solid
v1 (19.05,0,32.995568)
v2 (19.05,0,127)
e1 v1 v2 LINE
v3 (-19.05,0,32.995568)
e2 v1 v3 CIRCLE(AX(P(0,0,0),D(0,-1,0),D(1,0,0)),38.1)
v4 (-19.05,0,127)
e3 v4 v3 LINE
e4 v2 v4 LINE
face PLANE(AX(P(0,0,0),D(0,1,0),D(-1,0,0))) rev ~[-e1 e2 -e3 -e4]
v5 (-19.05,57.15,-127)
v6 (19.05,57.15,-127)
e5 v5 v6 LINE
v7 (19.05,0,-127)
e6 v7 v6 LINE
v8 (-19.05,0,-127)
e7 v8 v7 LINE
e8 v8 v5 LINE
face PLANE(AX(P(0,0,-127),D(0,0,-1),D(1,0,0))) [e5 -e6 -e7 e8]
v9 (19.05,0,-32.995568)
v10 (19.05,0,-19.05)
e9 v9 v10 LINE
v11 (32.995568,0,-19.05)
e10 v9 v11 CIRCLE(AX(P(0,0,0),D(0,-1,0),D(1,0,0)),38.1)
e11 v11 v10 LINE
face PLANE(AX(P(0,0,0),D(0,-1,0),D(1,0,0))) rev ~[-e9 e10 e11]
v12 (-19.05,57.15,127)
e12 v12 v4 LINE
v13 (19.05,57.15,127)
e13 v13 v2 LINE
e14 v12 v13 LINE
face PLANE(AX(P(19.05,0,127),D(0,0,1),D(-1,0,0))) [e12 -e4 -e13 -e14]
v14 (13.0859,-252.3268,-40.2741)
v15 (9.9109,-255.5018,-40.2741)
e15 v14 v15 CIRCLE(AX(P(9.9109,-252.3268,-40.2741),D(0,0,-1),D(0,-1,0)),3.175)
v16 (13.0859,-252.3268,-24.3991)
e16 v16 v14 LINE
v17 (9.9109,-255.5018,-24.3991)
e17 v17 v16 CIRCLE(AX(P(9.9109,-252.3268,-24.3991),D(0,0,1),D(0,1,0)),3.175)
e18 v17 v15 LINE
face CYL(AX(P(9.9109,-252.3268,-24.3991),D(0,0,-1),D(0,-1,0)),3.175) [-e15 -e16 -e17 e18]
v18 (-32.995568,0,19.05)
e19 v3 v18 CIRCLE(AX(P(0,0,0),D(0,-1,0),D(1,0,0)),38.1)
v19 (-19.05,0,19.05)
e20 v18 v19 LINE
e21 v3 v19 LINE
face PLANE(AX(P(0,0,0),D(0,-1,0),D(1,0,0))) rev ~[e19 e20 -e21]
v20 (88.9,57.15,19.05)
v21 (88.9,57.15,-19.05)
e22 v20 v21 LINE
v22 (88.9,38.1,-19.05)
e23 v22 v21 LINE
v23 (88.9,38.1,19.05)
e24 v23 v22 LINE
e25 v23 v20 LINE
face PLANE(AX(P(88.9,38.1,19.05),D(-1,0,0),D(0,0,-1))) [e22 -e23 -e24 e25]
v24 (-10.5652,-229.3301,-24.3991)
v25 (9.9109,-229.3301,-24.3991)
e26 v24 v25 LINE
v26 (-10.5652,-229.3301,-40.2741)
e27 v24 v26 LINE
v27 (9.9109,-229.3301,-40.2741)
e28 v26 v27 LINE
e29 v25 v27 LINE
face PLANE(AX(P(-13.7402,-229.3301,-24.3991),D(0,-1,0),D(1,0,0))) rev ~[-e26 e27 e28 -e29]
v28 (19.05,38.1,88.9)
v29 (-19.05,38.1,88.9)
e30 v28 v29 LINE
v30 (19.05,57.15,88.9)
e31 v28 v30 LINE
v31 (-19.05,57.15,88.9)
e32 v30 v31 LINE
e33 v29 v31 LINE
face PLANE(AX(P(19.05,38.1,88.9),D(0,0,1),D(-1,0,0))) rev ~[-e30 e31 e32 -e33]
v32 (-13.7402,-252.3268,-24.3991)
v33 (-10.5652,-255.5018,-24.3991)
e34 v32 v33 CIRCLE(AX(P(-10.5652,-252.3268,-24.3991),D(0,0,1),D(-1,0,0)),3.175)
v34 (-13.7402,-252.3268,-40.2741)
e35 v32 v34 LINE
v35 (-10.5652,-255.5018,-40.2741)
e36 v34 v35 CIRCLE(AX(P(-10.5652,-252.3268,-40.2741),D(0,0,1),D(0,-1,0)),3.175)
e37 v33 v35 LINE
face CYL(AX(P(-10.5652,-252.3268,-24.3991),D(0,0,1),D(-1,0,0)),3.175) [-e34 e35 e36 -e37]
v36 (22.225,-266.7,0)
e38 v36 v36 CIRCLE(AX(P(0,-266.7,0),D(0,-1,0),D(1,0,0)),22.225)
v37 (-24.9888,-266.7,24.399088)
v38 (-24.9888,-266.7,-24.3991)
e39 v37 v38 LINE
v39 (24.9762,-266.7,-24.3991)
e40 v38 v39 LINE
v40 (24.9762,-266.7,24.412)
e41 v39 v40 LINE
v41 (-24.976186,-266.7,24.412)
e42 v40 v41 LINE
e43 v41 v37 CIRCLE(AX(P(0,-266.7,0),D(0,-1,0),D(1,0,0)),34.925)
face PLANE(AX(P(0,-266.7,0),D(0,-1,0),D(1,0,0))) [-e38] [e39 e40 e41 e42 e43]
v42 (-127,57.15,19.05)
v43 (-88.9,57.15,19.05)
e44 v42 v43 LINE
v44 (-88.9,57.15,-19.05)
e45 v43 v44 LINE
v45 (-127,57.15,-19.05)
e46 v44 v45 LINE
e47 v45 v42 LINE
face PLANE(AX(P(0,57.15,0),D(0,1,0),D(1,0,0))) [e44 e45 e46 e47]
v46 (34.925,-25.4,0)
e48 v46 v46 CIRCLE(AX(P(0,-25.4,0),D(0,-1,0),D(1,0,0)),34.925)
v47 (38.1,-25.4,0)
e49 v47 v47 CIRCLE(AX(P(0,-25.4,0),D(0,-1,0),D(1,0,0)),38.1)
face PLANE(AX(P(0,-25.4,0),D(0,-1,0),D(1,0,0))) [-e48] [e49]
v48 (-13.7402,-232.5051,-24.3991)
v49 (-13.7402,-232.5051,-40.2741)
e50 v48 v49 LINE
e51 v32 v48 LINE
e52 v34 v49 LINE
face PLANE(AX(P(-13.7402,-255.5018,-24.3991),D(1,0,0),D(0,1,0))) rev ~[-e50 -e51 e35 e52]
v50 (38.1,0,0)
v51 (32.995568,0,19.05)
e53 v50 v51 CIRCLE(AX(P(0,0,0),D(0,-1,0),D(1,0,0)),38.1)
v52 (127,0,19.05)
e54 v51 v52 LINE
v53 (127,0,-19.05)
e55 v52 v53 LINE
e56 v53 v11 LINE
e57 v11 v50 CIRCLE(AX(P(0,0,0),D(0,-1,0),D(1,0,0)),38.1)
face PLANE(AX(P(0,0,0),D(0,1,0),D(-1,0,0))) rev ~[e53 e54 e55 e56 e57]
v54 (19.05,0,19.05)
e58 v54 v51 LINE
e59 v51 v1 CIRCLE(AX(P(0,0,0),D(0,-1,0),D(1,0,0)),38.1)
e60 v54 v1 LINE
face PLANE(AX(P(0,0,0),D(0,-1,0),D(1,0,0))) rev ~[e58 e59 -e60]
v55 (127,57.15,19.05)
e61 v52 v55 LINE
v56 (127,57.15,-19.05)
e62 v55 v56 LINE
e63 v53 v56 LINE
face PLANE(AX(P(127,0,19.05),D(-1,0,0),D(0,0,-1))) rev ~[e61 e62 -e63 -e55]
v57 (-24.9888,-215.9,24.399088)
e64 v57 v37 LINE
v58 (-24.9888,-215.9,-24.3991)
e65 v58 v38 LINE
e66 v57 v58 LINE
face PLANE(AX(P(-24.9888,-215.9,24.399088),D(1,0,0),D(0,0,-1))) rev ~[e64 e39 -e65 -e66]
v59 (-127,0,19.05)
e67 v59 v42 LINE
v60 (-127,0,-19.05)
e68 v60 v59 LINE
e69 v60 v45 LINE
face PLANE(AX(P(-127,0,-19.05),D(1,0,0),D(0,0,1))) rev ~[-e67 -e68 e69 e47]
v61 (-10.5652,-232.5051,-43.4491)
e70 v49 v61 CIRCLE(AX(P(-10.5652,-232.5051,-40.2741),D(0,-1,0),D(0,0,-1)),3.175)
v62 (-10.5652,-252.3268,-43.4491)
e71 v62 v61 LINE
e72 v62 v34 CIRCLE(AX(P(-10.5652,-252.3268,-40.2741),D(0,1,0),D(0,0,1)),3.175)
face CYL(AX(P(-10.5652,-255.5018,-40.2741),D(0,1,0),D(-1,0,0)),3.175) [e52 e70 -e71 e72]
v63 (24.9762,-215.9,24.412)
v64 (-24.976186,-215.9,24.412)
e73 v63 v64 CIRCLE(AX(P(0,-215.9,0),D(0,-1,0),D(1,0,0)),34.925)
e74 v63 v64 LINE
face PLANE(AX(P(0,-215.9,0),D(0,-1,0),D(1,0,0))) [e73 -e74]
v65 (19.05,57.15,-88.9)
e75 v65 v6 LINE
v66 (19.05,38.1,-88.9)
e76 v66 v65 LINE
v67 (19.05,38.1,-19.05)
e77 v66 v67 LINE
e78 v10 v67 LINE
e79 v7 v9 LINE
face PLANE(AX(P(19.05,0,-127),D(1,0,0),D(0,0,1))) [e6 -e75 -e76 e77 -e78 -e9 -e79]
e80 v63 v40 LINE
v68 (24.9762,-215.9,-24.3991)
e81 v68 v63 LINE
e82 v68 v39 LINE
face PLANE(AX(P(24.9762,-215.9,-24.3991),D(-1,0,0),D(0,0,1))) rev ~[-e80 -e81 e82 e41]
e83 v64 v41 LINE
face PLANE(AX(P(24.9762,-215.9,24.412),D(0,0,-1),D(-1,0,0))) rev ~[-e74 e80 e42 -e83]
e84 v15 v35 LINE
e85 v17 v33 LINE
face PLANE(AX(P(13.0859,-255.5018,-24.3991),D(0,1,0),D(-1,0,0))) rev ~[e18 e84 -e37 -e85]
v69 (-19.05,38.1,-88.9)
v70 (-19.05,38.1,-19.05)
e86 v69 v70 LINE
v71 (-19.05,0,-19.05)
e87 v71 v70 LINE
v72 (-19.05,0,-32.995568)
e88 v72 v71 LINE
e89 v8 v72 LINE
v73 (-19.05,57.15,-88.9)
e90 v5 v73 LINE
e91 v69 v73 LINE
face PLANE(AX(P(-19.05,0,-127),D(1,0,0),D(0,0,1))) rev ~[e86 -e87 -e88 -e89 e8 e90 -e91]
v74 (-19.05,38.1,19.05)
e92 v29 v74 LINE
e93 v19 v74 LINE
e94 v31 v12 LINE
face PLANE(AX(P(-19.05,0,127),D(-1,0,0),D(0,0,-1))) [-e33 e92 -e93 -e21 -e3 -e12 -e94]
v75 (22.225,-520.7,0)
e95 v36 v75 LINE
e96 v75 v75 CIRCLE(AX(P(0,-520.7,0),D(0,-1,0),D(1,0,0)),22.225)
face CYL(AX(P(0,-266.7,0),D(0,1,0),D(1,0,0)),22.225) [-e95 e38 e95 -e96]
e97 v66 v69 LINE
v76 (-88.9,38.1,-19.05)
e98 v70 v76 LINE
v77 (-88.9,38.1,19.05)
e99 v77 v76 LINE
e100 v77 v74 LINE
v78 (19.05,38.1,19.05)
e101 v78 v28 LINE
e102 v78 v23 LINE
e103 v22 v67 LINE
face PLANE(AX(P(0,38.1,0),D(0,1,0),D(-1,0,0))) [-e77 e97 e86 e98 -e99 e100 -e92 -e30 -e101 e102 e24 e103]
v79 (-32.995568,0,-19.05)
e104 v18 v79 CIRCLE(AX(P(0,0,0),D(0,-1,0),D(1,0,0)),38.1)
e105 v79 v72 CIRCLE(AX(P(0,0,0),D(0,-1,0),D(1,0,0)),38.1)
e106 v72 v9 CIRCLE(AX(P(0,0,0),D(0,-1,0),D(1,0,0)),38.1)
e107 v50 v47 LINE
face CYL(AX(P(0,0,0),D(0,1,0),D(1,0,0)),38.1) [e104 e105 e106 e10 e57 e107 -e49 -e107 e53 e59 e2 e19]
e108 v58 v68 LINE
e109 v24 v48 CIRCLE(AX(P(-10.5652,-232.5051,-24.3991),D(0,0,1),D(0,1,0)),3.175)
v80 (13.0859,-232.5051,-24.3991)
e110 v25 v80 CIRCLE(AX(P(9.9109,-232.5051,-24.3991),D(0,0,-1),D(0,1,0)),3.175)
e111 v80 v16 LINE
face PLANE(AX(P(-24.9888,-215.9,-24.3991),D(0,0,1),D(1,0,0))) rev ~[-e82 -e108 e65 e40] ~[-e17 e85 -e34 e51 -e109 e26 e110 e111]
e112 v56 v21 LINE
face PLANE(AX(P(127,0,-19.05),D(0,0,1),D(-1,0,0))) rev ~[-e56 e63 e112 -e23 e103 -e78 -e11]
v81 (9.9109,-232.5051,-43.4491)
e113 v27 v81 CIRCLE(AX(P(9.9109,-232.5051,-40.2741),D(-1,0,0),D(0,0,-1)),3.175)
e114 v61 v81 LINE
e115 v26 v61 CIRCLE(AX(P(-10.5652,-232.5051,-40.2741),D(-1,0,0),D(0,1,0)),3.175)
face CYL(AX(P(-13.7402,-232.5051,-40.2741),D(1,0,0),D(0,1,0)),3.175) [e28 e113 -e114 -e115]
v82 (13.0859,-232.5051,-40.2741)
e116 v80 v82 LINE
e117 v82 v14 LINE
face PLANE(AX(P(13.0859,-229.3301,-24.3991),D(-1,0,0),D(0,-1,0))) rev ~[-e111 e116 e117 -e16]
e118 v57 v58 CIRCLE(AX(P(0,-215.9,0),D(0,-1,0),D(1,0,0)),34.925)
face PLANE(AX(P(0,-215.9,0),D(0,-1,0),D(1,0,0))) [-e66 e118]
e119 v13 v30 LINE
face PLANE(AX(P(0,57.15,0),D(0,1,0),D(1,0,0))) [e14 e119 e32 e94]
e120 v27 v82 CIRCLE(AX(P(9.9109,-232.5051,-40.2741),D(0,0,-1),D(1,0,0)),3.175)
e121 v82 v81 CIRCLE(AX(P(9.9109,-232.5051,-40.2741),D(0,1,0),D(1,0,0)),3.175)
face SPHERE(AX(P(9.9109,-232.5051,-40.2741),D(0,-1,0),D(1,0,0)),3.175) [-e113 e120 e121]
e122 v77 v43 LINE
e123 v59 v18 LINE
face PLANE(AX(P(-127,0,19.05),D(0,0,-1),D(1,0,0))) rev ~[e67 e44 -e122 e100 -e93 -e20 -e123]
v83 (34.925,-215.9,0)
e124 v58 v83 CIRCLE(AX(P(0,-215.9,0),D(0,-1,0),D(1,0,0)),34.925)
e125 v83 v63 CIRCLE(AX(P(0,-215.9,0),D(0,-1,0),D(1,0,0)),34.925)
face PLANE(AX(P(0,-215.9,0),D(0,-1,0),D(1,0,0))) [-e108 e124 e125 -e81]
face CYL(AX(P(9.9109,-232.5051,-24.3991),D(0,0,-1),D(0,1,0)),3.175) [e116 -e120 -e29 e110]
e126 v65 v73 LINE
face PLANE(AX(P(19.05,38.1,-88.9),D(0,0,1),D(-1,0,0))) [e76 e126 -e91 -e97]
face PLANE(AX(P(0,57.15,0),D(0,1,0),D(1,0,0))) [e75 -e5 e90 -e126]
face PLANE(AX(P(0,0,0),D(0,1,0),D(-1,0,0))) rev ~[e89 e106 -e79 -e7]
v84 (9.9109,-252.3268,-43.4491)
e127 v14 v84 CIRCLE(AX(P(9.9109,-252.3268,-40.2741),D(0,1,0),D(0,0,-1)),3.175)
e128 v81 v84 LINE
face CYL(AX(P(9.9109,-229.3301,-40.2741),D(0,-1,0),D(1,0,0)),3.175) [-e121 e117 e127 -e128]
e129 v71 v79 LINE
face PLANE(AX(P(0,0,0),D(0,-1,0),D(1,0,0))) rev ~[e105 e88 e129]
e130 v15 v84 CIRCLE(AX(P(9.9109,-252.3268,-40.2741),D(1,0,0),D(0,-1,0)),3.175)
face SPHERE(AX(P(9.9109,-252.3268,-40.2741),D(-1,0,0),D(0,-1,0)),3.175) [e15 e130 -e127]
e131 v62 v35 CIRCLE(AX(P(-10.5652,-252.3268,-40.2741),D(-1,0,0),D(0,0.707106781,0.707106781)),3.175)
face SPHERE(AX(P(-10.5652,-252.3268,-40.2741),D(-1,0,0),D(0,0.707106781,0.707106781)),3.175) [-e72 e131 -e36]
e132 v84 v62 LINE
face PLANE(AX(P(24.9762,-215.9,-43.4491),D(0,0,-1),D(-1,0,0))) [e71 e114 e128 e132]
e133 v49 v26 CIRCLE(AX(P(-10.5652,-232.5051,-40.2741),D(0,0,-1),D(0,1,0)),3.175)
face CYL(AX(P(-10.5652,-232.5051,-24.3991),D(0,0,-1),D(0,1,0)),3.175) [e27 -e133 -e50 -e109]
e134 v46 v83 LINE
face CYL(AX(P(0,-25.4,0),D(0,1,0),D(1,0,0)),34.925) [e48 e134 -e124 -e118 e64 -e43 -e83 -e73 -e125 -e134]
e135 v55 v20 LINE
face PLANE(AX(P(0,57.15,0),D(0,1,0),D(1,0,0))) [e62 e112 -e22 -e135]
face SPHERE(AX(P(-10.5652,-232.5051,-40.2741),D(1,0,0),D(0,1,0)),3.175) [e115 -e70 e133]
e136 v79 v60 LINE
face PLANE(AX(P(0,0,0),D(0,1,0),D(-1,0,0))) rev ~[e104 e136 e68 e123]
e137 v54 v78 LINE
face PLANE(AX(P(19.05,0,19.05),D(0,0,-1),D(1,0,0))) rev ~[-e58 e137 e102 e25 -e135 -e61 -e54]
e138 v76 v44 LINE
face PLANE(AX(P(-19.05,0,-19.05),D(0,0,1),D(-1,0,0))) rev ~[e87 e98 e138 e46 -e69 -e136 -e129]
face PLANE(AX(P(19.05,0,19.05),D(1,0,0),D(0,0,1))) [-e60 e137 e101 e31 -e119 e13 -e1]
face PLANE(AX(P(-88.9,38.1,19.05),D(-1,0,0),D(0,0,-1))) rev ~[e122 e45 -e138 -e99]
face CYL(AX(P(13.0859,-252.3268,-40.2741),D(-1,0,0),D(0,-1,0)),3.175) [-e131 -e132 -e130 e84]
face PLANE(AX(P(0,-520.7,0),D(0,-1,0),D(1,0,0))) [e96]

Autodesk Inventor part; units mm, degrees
ref_plane "YZ Plane" through (0, 0, 0) normal (1, 0, 0) x (0, 1, 0)
ref_plane "XZ Plane" through (0, 0, 0) normal (0, 1, 0) x (-1, 0, 0)
ref_plane "XY Plane" through (0, 0, 0) normal (0, 0, 1) x (1, 0, 0)
sketch "Sketch1" plane through (0, 0, 0) normal (0, 1, 0) x (-1, 0, 0)
  line L0 (-127, 19.05) -> (-127, -19.05)
  line L1 (127, -19.05) -> (127, 19.05)
  line L2 (0, -127) -> (19.05, -127)
  line L3 (19.05, -127) -> (19.05, -19.05)
  line L4 (19.05, 0) -> (0, 0)
  line L5 (0, -127) -> (-19.05, -127)
  line L6 (-19.05, -127) -> (-19.05, -19.05)
  line L7 (-19.05, 0) -> (0, 0)
  line L8 (0, 0) -> (0, -127)
  line L9 (19.05, 0) -> (0, 0)
  line L10 (-19.05, 0) -> (-19.05, 127)
  line L11 (-19.05, 127) -> (19.05, 127)
  line L12 (19.05, 127) -> (19.05, 19.05)
  line L13 (-127, -19.05) -> (-19.05, -19.05)
  line L14 (19.05, -19.05) -> (127, -19.05)
  line L15 (127, 19.05) -> (19.05, 19.05)
  line L16 (-19.05, 19.05) -> (-127, 19.05)
  point P0 (127, 0)
  point P1 (-127, 0)
  point P2 (0, 19.05)
  point P3 (0, -19.05)
  dimension "d7" = 127
  dimension "d8" = 19.05
  dimension "d9" = 127
extrude "Extrusion1" add sketch "Sketch1" along normal blind 38.1
sketch "Sketch2" plane through (0, 38.1, 0) normal (0, 1, 0) x (1, 0, 0)
  line L0 (-19.05, -127) -> (19.05, -127) projected
  line L1 (-19.05, -127) -> (19.05, -127)
  line L2 (19.05, -127) -> (19.05, -88.9)
  line L3 (19.05, -88.9) -> (-19.05, -88.9)
  line L4 (-19.05, -88.9) -> (-19.05, -127)
  line L5 (-19.05, 127) -> (-19.05, 19.05) projected
  line L6 (19.05, 19.05) -> (19.05, 127) projected
  line L7 (-19.05, 127) -> (19.05, 127)
  line L8 (19.05, 127) -> (19.05, 88.9)
  line L9 (19.05, 88.9) -> (-19.05, 88.9)
  line L10 (-19.05, 88.9) -> (-19.05, 127)
  line L11 (-127, -19.05) -> (-19.05, -19.05) projected
  line L12 (-19.05, 19.05) -> (-127, 19.05) projected
  line L13 (-127, -19.05) -> (-88.9, -19.05)
  line L14 (-88.9, -19.05) -> (-88.9, 19.05)
  line L15 (-88.9, 19.05) -> (-127, 19.05)
  line L16 (-127, 19.05) -> (-127, -19.05)
  line L17 (127, -19.05) -> (127, 19.05) projected
  line L18 (127, 19.05) -> (19.05, 19.05) projected
  line L19 (127, -19.05) -> (88.9, -19.05)
  line L20 (88.9, -19.05) -> (88.9, 19.05)
  line L21 (88.9, 19.05) -> (127, 19.05)
  line L22 (127, 19.05) -> (127, -19.05)
  point P0 (0, 0)
  point P1 (-19.05, 88.9)
  dimension "d12" = 38.1
  dimension "d13" = 38.1
  dimension "d14" = 38.1
  dimension "d15" = 38.1
  dimension "d16" = 38.1
extrude "Extrusion2" add sketch "Sketch2" along normal blind 19.05
sketch "Sketch3" plane through (0, 0, 0) normal (0, -1, 0) x (1, 0, 0)
  circle A0 centre (0, 0) radius 38.1
  dimension "d19" = 76.2
extrude "Extrusion3" add sketch "Sketch3" along normal blind 25.4
sketch "Sketch4" plane through (0, -25.4, 0) normal (0, -1, 0) x (1, 0, 0)
  circle A0 centre (0, 0) radius 34.925
  dimension "d22" = 69.85
extrude "Extrusion4" add sketch "Sketch4" along normal blind 190.5
sketch "Sketch5" plane through (0, -215.9, 0) normal (0, -1, 0) x (1, 0, 0)
  circle A0 centre (0, 0) radius 34.925 projected
  line L0 (24.9762, 24.412) -> (-24.9888, 24.412)
  line L1 (-24.9888, 24.412) -> (-24.9888, -24.3991)
  line L2 (-24.9888, -24.3991) -> (24.9762, -24.3991)
  line L3 (24.9762, -24.3991) -> (24.9762, 24.412)
  point P0 (-24.9762, 24.412)
  point P1 (-24.9888, 24.3991)
extrude "Extrusion5" add sketch "Sketch5" along normal blind 50.8 contours L3 L2 L1 A0 L0
sketch "Sketch6" plane through (24.9762, -215.9, -24.3991) normal (0, 0, -1) x (-1, 0, 0)
  line L0 (11.8903, -39.6018) -> (38.7164, -39.6018)
  line L1 (38.7164, -39.6018) -> (38.7164, -13.4301)
  line L2 (38.7164, -13.4301) -> (11.8903, -13.4301)
  line L3 (11.8903, -13.4301) -> (11.8903, -39.6018)
  point P0 (24.9762, 215.9)
extrude "Extrusion6" add sketch "Sketch6" along normal blind 19.05
fillet "Fillet1" radius 3.175 7 edges at (-0.3271, -255.5018, -43.4491) (13.0859, -255.5018, -33.9241) (13.0859, -242.416, -43.4491) (13.0859, -229.3301, -33.9241) (-0.3271, -229.3301, -43.4491) (-13.7402, -229.3301, -33.9241) (-13.7402, -242.416, -43.4491)
fillet "Fillet2" radius 3.175 2 edges at (-12.8102, -254.5719, -42.5191) (-13.7402, -255.5018, -32.3366)
sketch "Sketch7" plane through (0, -266.7, 0) normal (0, -1, 0) x (1, 0, 0)
  circle A0 centre (0, 0) radius 22.225
  dimension "d31" = 44.45
extrude "Extrusion7" add sketch "Sketch7" along normal blind 254
sketch "Sketch8" plane through (0, -520.7, 0) normal (0, -1, 0) x (1, 0, 0)
  point P0 (0, 0)
properties part number "stand"
